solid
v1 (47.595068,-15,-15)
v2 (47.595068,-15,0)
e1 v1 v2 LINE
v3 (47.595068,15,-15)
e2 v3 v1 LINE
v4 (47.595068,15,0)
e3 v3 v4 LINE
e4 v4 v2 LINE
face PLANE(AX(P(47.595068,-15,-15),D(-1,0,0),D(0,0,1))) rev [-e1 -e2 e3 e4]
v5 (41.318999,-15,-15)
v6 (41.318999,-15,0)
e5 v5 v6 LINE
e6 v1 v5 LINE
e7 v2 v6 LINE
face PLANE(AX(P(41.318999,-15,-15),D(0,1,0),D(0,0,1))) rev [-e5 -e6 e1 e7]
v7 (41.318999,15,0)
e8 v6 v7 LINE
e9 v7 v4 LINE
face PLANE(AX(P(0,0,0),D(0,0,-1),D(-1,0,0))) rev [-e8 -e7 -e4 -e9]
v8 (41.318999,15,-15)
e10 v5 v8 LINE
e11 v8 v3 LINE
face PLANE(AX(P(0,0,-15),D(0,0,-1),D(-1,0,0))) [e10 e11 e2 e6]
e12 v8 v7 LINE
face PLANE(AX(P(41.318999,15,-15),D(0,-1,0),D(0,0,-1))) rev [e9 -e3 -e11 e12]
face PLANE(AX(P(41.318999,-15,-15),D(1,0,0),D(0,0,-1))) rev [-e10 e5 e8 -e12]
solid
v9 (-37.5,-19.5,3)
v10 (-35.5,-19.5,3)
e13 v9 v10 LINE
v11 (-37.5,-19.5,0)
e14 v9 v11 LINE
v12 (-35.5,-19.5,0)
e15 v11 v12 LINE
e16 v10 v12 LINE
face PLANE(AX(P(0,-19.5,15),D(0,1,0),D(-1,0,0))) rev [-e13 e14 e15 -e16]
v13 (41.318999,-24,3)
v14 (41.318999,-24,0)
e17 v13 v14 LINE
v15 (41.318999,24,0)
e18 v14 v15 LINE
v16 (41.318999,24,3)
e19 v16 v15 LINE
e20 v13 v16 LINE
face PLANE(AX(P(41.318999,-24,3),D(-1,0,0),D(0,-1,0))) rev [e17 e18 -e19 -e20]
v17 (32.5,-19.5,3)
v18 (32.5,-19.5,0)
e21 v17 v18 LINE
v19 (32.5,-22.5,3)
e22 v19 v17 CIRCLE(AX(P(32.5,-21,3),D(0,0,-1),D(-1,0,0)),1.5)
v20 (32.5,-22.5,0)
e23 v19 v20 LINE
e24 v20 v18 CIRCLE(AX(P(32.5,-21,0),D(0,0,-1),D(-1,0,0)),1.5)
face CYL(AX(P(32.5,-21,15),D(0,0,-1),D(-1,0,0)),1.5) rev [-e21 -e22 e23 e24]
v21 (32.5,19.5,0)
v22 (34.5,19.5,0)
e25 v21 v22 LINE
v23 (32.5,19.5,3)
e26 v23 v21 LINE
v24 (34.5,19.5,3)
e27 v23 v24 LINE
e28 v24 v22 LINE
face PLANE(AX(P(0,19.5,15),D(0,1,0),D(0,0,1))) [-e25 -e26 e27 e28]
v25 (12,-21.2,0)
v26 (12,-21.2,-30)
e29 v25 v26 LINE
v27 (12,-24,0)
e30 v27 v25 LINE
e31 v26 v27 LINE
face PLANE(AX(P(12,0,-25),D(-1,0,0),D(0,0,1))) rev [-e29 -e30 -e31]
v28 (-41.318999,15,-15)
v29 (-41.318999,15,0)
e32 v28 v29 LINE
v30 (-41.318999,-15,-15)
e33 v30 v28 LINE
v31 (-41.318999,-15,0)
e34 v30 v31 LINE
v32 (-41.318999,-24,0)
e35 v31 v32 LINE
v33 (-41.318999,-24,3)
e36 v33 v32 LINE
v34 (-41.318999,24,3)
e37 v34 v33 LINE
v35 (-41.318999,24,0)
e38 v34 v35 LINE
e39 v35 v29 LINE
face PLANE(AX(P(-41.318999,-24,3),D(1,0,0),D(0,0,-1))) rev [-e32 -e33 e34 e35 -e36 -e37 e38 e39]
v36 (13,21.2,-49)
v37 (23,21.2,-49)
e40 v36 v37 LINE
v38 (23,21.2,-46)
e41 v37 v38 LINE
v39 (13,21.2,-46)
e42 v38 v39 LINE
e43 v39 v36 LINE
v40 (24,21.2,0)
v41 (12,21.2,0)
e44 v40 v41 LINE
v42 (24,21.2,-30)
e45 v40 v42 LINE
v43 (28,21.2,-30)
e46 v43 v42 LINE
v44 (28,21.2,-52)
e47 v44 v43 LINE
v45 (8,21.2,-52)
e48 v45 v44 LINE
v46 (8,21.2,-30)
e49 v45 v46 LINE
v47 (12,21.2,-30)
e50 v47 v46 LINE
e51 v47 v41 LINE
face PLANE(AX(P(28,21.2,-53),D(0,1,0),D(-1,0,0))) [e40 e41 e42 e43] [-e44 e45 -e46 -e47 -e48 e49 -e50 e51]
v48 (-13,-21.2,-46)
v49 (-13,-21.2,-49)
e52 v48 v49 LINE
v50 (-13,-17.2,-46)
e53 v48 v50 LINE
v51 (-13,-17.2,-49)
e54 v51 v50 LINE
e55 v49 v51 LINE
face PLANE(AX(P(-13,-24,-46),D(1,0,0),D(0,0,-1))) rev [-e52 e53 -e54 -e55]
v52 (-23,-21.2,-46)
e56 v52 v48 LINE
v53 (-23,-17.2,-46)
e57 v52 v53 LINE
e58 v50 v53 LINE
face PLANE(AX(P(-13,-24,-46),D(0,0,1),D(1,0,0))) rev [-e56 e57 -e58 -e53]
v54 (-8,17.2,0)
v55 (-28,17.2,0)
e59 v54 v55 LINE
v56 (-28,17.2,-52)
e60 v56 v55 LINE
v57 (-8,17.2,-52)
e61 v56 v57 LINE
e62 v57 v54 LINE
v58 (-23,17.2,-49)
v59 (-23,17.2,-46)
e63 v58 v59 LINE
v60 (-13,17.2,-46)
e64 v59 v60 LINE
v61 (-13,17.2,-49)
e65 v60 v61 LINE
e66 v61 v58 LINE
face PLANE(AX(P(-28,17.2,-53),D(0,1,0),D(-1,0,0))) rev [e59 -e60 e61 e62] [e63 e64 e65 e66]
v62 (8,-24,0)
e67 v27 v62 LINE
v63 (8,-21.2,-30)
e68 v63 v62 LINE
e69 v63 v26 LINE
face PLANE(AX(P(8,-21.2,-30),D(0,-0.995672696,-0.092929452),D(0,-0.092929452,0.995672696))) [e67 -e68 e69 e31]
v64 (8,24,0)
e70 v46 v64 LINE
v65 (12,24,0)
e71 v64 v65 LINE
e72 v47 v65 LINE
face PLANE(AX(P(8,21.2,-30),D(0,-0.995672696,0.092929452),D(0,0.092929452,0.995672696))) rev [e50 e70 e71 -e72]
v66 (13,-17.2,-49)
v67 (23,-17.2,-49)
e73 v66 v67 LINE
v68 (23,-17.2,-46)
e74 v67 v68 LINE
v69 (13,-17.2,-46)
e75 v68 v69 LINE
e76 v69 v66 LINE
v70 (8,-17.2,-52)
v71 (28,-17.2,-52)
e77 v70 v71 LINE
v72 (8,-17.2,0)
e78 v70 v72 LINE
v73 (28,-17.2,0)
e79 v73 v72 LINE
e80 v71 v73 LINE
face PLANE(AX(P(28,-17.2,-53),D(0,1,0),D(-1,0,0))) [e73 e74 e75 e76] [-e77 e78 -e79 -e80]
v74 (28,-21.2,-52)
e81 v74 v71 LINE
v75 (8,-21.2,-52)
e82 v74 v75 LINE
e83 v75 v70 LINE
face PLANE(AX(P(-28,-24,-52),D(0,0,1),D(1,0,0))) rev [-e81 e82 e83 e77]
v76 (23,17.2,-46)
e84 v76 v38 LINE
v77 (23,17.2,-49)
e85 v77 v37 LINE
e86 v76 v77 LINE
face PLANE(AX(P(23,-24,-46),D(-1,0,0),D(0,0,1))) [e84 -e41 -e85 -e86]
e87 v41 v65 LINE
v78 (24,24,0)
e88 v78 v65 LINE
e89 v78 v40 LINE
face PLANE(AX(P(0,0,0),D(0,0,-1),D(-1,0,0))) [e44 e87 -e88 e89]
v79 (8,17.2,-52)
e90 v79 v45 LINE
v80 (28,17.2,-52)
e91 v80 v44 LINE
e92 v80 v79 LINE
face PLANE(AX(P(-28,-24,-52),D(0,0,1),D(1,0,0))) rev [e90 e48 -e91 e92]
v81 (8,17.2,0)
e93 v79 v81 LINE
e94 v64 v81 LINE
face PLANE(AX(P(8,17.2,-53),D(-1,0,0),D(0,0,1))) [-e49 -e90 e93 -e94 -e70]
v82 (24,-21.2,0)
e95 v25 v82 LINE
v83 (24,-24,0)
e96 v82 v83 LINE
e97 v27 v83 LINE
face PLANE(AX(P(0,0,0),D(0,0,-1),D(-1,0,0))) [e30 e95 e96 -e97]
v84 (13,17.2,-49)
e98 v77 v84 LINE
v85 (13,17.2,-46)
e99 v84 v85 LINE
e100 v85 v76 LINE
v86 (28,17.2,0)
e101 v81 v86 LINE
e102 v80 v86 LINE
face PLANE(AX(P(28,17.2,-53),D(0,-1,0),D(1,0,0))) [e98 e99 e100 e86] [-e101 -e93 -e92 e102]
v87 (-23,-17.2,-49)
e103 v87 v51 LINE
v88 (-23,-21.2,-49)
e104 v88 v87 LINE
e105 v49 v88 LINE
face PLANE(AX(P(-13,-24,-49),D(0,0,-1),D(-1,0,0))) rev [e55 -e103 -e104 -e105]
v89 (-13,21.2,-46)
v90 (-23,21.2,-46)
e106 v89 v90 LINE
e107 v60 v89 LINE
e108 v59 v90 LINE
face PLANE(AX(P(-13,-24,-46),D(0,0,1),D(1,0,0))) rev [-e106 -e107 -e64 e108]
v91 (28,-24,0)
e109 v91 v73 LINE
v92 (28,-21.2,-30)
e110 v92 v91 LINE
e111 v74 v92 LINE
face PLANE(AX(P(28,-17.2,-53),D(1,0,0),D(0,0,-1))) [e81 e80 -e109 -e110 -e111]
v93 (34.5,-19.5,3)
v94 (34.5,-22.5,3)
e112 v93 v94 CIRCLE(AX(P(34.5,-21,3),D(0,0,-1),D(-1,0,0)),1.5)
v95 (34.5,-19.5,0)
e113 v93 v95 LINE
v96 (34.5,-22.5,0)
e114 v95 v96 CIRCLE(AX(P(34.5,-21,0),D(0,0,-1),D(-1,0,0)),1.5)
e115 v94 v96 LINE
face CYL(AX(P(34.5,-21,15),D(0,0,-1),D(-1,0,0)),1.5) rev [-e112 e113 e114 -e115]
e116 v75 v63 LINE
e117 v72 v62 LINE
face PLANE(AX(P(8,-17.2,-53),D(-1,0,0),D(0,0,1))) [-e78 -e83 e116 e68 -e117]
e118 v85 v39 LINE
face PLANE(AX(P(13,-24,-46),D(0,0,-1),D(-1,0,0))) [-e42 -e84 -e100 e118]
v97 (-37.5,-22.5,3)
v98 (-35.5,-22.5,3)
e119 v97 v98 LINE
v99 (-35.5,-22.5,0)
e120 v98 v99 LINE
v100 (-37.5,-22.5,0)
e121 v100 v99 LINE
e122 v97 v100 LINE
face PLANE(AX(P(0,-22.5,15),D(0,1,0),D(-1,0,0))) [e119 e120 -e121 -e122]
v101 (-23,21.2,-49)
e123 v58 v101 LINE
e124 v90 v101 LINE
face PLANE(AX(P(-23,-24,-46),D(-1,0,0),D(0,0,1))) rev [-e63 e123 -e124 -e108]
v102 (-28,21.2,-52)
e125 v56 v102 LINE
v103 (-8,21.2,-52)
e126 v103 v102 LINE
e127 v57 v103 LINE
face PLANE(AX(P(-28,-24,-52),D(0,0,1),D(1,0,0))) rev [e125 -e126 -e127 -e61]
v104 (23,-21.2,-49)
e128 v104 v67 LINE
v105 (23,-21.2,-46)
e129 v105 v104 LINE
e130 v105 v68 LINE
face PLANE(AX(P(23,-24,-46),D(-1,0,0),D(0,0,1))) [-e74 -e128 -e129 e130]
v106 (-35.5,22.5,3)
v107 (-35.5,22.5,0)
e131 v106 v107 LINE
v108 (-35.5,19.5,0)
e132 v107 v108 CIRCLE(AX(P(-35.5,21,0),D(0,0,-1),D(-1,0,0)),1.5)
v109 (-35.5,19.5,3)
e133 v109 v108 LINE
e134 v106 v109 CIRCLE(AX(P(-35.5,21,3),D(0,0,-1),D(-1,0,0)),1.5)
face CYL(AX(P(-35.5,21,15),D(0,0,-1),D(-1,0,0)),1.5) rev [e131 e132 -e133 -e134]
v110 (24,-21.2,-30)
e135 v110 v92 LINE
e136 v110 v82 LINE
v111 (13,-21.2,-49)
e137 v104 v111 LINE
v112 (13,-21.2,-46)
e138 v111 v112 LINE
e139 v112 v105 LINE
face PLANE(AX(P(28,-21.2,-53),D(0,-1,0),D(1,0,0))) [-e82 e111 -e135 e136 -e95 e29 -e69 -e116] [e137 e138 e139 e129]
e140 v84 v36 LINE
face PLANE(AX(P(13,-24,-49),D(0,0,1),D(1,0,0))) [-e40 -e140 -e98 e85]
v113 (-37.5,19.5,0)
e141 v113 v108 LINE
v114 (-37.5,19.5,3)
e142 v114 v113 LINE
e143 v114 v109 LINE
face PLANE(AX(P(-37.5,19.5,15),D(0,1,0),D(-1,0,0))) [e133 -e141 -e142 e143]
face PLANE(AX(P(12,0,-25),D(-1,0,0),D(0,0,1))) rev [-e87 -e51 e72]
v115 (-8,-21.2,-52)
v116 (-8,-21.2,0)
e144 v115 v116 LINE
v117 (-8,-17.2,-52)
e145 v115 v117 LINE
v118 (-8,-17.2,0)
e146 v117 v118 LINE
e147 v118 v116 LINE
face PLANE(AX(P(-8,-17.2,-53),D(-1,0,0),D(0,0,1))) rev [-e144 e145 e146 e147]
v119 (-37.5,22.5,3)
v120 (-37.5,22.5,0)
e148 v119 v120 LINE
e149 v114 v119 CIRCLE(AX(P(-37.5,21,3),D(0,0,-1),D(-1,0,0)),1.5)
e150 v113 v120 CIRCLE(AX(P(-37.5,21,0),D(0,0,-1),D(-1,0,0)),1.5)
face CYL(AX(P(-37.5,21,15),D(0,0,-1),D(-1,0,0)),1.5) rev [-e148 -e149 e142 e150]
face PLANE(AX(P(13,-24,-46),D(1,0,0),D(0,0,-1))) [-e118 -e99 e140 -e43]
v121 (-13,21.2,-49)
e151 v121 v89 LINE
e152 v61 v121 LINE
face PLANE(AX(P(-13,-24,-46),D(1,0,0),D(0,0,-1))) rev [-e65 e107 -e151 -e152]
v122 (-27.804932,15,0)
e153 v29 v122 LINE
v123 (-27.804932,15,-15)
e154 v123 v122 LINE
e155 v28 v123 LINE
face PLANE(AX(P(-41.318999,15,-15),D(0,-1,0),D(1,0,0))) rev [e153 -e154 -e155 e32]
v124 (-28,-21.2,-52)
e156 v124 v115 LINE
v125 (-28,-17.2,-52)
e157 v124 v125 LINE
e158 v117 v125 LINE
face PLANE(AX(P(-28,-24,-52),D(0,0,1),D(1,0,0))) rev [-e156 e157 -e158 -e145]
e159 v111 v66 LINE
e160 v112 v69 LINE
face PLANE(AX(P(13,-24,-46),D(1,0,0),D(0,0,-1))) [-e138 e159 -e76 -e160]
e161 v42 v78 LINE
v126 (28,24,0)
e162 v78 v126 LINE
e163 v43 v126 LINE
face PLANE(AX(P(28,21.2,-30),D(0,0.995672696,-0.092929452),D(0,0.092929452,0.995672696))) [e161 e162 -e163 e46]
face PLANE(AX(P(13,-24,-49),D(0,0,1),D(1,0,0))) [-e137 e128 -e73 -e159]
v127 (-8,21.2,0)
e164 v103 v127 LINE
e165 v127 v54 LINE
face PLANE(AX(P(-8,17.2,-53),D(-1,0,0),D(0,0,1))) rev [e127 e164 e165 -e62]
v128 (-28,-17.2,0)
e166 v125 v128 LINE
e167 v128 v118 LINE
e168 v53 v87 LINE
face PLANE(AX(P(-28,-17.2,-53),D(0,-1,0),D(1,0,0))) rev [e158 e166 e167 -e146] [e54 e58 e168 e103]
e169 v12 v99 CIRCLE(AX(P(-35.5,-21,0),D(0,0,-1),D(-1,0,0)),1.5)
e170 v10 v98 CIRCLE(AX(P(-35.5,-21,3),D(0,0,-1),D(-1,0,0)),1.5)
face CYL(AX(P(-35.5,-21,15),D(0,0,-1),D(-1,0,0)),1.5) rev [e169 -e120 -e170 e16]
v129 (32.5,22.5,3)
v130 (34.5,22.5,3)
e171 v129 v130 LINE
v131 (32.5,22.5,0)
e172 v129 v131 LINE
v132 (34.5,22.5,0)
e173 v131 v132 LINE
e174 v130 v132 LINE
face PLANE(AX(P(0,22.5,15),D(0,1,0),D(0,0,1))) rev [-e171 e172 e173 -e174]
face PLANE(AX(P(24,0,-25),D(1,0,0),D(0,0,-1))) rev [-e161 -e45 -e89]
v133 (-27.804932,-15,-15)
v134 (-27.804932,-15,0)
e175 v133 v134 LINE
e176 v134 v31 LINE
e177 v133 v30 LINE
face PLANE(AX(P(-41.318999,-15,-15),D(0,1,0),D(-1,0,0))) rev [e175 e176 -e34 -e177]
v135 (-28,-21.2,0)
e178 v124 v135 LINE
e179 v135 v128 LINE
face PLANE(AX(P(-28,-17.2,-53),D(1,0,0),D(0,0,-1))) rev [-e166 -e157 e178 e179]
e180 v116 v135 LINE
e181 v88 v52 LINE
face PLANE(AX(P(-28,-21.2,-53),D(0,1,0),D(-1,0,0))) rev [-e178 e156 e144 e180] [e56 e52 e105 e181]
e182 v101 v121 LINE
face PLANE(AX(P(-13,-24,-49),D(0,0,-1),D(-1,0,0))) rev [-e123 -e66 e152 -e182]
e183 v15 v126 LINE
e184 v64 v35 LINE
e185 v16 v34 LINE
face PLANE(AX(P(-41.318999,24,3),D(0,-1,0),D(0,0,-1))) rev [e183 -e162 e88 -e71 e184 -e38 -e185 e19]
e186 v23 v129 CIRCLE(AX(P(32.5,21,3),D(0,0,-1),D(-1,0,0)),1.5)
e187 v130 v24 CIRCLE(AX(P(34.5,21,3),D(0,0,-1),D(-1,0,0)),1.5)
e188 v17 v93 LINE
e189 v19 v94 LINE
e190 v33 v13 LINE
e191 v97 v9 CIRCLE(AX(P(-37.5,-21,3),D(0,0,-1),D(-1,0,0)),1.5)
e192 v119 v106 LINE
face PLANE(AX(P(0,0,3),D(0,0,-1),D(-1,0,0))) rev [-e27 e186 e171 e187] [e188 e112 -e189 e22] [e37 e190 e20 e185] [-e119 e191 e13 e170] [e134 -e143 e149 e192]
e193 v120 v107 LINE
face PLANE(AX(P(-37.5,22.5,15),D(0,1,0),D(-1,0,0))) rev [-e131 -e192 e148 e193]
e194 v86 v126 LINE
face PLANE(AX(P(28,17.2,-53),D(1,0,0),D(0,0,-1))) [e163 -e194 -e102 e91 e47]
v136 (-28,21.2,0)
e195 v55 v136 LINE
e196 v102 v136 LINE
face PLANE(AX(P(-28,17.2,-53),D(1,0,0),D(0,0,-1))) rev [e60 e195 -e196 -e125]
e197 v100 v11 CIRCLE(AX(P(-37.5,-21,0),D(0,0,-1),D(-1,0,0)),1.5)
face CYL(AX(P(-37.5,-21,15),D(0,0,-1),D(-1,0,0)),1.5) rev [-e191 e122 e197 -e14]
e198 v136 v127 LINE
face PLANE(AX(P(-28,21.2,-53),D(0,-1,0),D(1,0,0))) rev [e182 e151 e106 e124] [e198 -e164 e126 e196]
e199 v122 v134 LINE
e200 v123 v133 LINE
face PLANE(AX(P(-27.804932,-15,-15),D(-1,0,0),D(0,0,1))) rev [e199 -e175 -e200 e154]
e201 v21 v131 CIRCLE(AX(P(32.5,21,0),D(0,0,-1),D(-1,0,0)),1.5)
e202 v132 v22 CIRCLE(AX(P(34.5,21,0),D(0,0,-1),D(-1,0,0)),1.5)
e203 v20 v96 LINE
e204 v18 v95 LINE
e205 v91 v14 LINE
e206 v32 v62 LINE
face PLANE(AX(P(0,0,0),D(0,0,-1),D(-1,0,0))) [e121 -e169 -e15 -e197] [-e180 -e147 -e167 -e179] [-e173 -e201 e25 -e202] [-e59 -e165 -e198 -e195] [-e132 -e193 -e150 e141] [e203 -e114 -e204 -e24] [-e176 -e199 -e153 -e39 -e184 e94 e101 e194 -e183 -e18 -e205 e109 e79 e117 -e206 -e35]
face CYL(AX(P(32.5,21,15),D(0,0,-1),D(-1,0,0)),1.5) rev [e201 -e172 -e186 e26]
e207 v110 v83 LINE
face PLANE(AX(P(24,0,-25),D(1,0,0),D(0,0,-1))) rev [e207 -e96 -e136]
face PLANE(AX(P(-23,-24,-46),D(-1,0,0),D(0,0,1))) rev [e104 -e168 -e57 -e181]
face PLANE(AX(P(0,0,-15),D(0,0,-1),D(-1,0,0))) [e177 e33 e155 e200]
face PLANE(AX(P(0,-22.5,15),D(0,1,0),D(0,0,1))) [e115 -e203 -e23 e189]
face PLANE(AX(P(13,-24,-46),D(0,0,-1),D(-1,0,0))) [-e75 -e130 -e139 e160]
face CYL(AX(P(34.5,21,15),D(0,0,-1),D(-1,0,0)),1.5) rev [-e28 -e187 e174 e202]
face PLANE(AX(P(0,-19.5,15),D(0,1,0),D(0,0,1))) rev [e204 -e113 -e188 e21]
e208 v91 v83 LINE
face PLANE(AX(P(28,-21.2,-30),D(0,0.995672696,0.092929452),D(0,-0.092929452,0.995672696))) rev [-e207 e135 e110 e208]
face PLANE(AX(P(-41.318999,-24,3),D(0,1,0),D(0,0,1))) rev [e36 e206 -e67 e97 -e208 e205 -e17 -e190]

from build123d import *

# Parameters (mm, degrees)
SKETCH_2_W               = 82.637997944
SKETCH_2_H               = 48
EXTRUDE_1_DEPTH          = 3
SKETCH_3_W               = 20
SKETCH_3_H               = 4
EXTRUDE_2_DEPTH          = 53
SKETCH_4_W               = 13.514067067
SKETCH_4_H               = 30
EXTRUDE_3_DEPTH          = 15
SKETCH_5_W               = 6.276069123
SKETCH_5_H               = 30
EXTRUDE_4_DEPTH          = 15
SKETCH_6_W               = 10
SKETCH_6_H               = 3
CUT_EXTRUDE_1_DEPTH      = 83.290525013
MIRROR_START             = 8
MIRROR_2_OUTLINE_W       = 4
MIRROR_2_OUTLINE_H       = 46
MIRROR_2_OUTLINE_H_2     = 4
MIRROR_2_DEPTH           = 20
MIRROR_2_2_OUTLINE_W     = 4
MIRROR_2_2_OUTLINE_H     = 3
MIRROR_2_2_DEPTH         = 4
MIRROR_START_2           = 24
MIRROR_2_3_OUTLINE_W     = 4
MIRROR_2_3_OUTLINE_H     = 3
MIRROR_2_3_DEPTH         = 4
MIRROR_START_3           = 12
MIRROR_2_4_OUTLINE_W     = 4
MIRROR_2_4_OUTLINE_H     = 3
MIRROR_2_4_DEPTH         = 1
MIRROR_START_4           = 23
MIRROR_2_5_OUTLINE_W     = 4
MIRROR_2_5_OUTLINE_H     = 3
MIRROR_2_5_DEPTH         = 1
CUT_EXTRUDE_3_DEPTH      = 15
CUT_EXTRUDE_4_DEPTH      = 85.364272693
CUT_EXTRUDE_4_DEPTH_BACK = 85.364272693
SKETCH_10_W              = 56
SKETCH_10_H              = 1


with BuildPart() as part:
    # 草图2 → 凸台-拉伸1 (new body)
    with BuildSketch(Plane.XY):
        Rectangle(SKETCH_2_W, SKETCH_2_H)
    extrude(amount=EXTRUDE_1_DEPTH)

    # 草图3 → 凸台-拉伸2 (add)
    with BuildSketch(Plane(origin=(0, 0, 0), x_dir=(-1, 0, 0), z_dir=(0, 0, -1))):
        with Locations((18, 19.2)):
            Rectangle(SKETCH_3_W, SKETCH_3_H)
        with Locations((18, -19.2)):
            Rectangle(SKETCH_3_W, SKETCH_3_H)
    extrude(amount=EXTRUDE_2_DEPTH)

    # 草图4 → 凸台-拉伸3 (add)
    with BuildSketch(Plane(origin=(0, 0, 0), x_dir=(-1, 0, 0), z_dir=(0, 0, -1))):
        with Locations((34.561965439, 0)):
            Rectangle(SKETCH_4_W, SKETCH_4_H)
    extrude(amount=EXTRUDE_3_DEPTH)

    # 草图6 → 切除-拉伸1 (cut, symmetric)
    with BuildSketch(Plane(origin=(0, -17.2, 0), x_dir=(1, 0, 0), z_dir=(0, 1, 0))):
        with Locations((-18, 47.5)):
            Rectangle(SKETCH_6_W, SKETCH_6_H)
    extrude(amount=CUT_EXTRUDE_1_DEPTH, both=True, mode=Mode.SUBTRACT)

    # 镜向2: read off the stored shape, not the designer's step
    # 镜向2 outline → 镜向2 (add)
    with BuildSketch(Plane.YZ.offset(MIRROR_START)):
        with Locations((19.2, -23)):
            Rectangle(MIRROR_2_OUTLINE_W, MIRROR_2_OUTLINE_H)
        with Locations((-19.2, -23)):
            Rectangle(MIRROR_2_OUTLINE_W, MIRROR_2_OUTLINE_H)
        with Locations((19.2, -51)):
            Rectangle(MIRROR_2_OUTLINE_W, MIRROR_2_OUTLINE_H_2)
        with Locations((-19.2, -51)):
            Rectangle(MIRROR_2_OUTLINE_W, MIRROR_2_OUTLINE_H_2)
    extrude(amount=MIRROR_2_DEPTH)

    # Mirror 2 2 outline → Mirror 2 2 (add)
    with BuildSketch(Plane.YZ.offset(MIRROR_START)):
        with Locations((19.2, -47.5)):
            Rectangle(MIRROR_2_2_OUTLINE_W, MIRROR_2_2_OUTLINE_H)
        Polygon((24, 0), (21.2, 0), (21.2, -30), align=None)
        with Locations((-19.2, -47.5)):
            Rectangle(MIRROR_2_2_OUTLINE_W, MIRROR_2_2_OUTLINE_H)
        Polygon((-21.2, -30), (-21.2, 0), (-24, 0), align=None)
    extrude(amount=MIRROR_2_2_DEPTH)

    # Mirror 2 3 outline → Mirror 2 3 (add)
    with BuildSketch(Plane.YZ.offset(MIRROR_START_2)):
        with Locations((19.2, -47.5)):
            Rectangle(MIRROR_2_3_OUTLINE_W, MIRROR_2_3_OUTLINE_H)
        Polygon((24, 0), (21.2, 0), (21.2, -30), align=None)
        with Locations((-19.2, -47.5)):
            Rectangle(MIRROR_2_3_OUTLINE_W, MIRROR_2_3_OUTLINE_H)
        Polygon((-21.2, -30), (-21.2, 0), (-24, 0), align=None)
    extrude(amount=MIRROR_2_3_DEPTH)

    # Mirror 2 4 outline → Mirror 2 4 (add)
    with BuildSketch(Plane.YZ.offset(MIRROR_START_3)):
        with Locations((19.2, -47.5)):
            Rectangle(MIRROR_2_4_OUTLINE_W, MIRROR_2_4_OUTLINE_H)
        with Locations((-19.2, -47.5)):
            Rectangle(MIRROR_2_4_OUTLINE_W, MIRROR_2_4_OUTLINE_H)
    extrude(amount=MIRROR_2_4_DEPTH)

    # Mirror 2 5 outline → Mirror 2 5 (add)
    with BuildSketch(Plane.YZ.offset(MIRROR_START_4)):
        with Locations((19.2, -47.5)):
            Rectangle(MIRROR_2_5_OUTLINE_W, MIRROR_2_5_OUTLINE_H)
        with Locations((-19.2, -47.5)):
            Rectangle(MIRROR_2_5_OUTLINE_W, MIRROR_2_5_OUTLINE_H)
    extrude(amount=MIRROR_2_5_DEPTH)

    # 草图8 → 切除-拉伸3 (cut)
    with BuildSketch(Plane(origin=(0, 0, 0), x_dir=(-1, 0, 0), z_dir=(0, 0, -1))):
        with BuildLine():
            Line((37.5, -19.5), (35.5, -19.5))
            ThreePointArc((35.5, -19.5), (34, -21), (35.5, -22.5))
            Line((35.5, -22.5), (37.5, -22.5))
            ThreePointArc((37.5, -22.5), (39, -21), (37.5, -19.5))
        make_face()
        with BuildLine():
            Line((-32.5, -19.5), (-34.5, -19.5))
            ThreePointArc((-34.5, -19.5), (-36, -21), (-34.5, -22.5))
            Line((-34.5, -22.5), (-32.5, -22.5))
            ThreePointArc((-32.5, -22.5), (-31, -21), (-32.5, -19.5))
        make_face()
        with BuildLine():
            Line((-32.5, 22.5), (-34.5, 22.5))
            ThreePointArc((-34.5, 22.5), (-36, 21), (-34.5, 19.5))
            Line((-34.5, 19.5), (-32.5, 19.5))
            ThreePointArc((-32.5, 19.5), (-31, 21), (-32.5, 22.5))
        make_face()
        with BuildLine():
            Line((37.5, 19.5), (35.5, 19.5))
            ThreePointArc((35.5, 19.5), (34, 21), (35.5, 22.5))
            Line((35.5, 22.5), (37.5, 22.5))
            ThreePointArc((37.5, 22.5), (39, 21), (37.5, 19.5))
        make_face()
    extrude(amount=-CUT_EXTRUDE_3_DEPTH, mode=Mode.SUBTRACT)

    # 草图10 → 切除-拉伸4 (cut, two sides: drawn at the far end of the back side and taken through both)
    with BuildSketch(Plane(origin=(0, 21.2, 0), x_dir=(1, 0, 0), z_dir=(0, 1, 0)).offset(-CUT_EXTRUDE_4_DEPTH_BACK)):
        with Locations((0, 52.5)):
            Rectangle(SKETCH_10_W, SKETCH_10_H)
    extrude(amount=CUT_EXTRUDE_4_DEPTH + CUT_EXTRUDE_4_DEPTH_BACK, mode=Mode.SUBTRACT)


with BuildPart() as body_2:
    # 草图5 → 凸台-拉伸4 (new body)
    with BuildSketch(Plane(origin=(0, 0, 0), x_dir=(-1, 0, 0), z_dir=(0, 0, -1))):
        with Locations((-44.457033534, 0)):
            Rectangle(SKETCH_5_W, SKETCH_5_H)
    extrude(amount=EXTRUDE_4_DEPTH)


solid = Compound([part.part, body_2.part])
